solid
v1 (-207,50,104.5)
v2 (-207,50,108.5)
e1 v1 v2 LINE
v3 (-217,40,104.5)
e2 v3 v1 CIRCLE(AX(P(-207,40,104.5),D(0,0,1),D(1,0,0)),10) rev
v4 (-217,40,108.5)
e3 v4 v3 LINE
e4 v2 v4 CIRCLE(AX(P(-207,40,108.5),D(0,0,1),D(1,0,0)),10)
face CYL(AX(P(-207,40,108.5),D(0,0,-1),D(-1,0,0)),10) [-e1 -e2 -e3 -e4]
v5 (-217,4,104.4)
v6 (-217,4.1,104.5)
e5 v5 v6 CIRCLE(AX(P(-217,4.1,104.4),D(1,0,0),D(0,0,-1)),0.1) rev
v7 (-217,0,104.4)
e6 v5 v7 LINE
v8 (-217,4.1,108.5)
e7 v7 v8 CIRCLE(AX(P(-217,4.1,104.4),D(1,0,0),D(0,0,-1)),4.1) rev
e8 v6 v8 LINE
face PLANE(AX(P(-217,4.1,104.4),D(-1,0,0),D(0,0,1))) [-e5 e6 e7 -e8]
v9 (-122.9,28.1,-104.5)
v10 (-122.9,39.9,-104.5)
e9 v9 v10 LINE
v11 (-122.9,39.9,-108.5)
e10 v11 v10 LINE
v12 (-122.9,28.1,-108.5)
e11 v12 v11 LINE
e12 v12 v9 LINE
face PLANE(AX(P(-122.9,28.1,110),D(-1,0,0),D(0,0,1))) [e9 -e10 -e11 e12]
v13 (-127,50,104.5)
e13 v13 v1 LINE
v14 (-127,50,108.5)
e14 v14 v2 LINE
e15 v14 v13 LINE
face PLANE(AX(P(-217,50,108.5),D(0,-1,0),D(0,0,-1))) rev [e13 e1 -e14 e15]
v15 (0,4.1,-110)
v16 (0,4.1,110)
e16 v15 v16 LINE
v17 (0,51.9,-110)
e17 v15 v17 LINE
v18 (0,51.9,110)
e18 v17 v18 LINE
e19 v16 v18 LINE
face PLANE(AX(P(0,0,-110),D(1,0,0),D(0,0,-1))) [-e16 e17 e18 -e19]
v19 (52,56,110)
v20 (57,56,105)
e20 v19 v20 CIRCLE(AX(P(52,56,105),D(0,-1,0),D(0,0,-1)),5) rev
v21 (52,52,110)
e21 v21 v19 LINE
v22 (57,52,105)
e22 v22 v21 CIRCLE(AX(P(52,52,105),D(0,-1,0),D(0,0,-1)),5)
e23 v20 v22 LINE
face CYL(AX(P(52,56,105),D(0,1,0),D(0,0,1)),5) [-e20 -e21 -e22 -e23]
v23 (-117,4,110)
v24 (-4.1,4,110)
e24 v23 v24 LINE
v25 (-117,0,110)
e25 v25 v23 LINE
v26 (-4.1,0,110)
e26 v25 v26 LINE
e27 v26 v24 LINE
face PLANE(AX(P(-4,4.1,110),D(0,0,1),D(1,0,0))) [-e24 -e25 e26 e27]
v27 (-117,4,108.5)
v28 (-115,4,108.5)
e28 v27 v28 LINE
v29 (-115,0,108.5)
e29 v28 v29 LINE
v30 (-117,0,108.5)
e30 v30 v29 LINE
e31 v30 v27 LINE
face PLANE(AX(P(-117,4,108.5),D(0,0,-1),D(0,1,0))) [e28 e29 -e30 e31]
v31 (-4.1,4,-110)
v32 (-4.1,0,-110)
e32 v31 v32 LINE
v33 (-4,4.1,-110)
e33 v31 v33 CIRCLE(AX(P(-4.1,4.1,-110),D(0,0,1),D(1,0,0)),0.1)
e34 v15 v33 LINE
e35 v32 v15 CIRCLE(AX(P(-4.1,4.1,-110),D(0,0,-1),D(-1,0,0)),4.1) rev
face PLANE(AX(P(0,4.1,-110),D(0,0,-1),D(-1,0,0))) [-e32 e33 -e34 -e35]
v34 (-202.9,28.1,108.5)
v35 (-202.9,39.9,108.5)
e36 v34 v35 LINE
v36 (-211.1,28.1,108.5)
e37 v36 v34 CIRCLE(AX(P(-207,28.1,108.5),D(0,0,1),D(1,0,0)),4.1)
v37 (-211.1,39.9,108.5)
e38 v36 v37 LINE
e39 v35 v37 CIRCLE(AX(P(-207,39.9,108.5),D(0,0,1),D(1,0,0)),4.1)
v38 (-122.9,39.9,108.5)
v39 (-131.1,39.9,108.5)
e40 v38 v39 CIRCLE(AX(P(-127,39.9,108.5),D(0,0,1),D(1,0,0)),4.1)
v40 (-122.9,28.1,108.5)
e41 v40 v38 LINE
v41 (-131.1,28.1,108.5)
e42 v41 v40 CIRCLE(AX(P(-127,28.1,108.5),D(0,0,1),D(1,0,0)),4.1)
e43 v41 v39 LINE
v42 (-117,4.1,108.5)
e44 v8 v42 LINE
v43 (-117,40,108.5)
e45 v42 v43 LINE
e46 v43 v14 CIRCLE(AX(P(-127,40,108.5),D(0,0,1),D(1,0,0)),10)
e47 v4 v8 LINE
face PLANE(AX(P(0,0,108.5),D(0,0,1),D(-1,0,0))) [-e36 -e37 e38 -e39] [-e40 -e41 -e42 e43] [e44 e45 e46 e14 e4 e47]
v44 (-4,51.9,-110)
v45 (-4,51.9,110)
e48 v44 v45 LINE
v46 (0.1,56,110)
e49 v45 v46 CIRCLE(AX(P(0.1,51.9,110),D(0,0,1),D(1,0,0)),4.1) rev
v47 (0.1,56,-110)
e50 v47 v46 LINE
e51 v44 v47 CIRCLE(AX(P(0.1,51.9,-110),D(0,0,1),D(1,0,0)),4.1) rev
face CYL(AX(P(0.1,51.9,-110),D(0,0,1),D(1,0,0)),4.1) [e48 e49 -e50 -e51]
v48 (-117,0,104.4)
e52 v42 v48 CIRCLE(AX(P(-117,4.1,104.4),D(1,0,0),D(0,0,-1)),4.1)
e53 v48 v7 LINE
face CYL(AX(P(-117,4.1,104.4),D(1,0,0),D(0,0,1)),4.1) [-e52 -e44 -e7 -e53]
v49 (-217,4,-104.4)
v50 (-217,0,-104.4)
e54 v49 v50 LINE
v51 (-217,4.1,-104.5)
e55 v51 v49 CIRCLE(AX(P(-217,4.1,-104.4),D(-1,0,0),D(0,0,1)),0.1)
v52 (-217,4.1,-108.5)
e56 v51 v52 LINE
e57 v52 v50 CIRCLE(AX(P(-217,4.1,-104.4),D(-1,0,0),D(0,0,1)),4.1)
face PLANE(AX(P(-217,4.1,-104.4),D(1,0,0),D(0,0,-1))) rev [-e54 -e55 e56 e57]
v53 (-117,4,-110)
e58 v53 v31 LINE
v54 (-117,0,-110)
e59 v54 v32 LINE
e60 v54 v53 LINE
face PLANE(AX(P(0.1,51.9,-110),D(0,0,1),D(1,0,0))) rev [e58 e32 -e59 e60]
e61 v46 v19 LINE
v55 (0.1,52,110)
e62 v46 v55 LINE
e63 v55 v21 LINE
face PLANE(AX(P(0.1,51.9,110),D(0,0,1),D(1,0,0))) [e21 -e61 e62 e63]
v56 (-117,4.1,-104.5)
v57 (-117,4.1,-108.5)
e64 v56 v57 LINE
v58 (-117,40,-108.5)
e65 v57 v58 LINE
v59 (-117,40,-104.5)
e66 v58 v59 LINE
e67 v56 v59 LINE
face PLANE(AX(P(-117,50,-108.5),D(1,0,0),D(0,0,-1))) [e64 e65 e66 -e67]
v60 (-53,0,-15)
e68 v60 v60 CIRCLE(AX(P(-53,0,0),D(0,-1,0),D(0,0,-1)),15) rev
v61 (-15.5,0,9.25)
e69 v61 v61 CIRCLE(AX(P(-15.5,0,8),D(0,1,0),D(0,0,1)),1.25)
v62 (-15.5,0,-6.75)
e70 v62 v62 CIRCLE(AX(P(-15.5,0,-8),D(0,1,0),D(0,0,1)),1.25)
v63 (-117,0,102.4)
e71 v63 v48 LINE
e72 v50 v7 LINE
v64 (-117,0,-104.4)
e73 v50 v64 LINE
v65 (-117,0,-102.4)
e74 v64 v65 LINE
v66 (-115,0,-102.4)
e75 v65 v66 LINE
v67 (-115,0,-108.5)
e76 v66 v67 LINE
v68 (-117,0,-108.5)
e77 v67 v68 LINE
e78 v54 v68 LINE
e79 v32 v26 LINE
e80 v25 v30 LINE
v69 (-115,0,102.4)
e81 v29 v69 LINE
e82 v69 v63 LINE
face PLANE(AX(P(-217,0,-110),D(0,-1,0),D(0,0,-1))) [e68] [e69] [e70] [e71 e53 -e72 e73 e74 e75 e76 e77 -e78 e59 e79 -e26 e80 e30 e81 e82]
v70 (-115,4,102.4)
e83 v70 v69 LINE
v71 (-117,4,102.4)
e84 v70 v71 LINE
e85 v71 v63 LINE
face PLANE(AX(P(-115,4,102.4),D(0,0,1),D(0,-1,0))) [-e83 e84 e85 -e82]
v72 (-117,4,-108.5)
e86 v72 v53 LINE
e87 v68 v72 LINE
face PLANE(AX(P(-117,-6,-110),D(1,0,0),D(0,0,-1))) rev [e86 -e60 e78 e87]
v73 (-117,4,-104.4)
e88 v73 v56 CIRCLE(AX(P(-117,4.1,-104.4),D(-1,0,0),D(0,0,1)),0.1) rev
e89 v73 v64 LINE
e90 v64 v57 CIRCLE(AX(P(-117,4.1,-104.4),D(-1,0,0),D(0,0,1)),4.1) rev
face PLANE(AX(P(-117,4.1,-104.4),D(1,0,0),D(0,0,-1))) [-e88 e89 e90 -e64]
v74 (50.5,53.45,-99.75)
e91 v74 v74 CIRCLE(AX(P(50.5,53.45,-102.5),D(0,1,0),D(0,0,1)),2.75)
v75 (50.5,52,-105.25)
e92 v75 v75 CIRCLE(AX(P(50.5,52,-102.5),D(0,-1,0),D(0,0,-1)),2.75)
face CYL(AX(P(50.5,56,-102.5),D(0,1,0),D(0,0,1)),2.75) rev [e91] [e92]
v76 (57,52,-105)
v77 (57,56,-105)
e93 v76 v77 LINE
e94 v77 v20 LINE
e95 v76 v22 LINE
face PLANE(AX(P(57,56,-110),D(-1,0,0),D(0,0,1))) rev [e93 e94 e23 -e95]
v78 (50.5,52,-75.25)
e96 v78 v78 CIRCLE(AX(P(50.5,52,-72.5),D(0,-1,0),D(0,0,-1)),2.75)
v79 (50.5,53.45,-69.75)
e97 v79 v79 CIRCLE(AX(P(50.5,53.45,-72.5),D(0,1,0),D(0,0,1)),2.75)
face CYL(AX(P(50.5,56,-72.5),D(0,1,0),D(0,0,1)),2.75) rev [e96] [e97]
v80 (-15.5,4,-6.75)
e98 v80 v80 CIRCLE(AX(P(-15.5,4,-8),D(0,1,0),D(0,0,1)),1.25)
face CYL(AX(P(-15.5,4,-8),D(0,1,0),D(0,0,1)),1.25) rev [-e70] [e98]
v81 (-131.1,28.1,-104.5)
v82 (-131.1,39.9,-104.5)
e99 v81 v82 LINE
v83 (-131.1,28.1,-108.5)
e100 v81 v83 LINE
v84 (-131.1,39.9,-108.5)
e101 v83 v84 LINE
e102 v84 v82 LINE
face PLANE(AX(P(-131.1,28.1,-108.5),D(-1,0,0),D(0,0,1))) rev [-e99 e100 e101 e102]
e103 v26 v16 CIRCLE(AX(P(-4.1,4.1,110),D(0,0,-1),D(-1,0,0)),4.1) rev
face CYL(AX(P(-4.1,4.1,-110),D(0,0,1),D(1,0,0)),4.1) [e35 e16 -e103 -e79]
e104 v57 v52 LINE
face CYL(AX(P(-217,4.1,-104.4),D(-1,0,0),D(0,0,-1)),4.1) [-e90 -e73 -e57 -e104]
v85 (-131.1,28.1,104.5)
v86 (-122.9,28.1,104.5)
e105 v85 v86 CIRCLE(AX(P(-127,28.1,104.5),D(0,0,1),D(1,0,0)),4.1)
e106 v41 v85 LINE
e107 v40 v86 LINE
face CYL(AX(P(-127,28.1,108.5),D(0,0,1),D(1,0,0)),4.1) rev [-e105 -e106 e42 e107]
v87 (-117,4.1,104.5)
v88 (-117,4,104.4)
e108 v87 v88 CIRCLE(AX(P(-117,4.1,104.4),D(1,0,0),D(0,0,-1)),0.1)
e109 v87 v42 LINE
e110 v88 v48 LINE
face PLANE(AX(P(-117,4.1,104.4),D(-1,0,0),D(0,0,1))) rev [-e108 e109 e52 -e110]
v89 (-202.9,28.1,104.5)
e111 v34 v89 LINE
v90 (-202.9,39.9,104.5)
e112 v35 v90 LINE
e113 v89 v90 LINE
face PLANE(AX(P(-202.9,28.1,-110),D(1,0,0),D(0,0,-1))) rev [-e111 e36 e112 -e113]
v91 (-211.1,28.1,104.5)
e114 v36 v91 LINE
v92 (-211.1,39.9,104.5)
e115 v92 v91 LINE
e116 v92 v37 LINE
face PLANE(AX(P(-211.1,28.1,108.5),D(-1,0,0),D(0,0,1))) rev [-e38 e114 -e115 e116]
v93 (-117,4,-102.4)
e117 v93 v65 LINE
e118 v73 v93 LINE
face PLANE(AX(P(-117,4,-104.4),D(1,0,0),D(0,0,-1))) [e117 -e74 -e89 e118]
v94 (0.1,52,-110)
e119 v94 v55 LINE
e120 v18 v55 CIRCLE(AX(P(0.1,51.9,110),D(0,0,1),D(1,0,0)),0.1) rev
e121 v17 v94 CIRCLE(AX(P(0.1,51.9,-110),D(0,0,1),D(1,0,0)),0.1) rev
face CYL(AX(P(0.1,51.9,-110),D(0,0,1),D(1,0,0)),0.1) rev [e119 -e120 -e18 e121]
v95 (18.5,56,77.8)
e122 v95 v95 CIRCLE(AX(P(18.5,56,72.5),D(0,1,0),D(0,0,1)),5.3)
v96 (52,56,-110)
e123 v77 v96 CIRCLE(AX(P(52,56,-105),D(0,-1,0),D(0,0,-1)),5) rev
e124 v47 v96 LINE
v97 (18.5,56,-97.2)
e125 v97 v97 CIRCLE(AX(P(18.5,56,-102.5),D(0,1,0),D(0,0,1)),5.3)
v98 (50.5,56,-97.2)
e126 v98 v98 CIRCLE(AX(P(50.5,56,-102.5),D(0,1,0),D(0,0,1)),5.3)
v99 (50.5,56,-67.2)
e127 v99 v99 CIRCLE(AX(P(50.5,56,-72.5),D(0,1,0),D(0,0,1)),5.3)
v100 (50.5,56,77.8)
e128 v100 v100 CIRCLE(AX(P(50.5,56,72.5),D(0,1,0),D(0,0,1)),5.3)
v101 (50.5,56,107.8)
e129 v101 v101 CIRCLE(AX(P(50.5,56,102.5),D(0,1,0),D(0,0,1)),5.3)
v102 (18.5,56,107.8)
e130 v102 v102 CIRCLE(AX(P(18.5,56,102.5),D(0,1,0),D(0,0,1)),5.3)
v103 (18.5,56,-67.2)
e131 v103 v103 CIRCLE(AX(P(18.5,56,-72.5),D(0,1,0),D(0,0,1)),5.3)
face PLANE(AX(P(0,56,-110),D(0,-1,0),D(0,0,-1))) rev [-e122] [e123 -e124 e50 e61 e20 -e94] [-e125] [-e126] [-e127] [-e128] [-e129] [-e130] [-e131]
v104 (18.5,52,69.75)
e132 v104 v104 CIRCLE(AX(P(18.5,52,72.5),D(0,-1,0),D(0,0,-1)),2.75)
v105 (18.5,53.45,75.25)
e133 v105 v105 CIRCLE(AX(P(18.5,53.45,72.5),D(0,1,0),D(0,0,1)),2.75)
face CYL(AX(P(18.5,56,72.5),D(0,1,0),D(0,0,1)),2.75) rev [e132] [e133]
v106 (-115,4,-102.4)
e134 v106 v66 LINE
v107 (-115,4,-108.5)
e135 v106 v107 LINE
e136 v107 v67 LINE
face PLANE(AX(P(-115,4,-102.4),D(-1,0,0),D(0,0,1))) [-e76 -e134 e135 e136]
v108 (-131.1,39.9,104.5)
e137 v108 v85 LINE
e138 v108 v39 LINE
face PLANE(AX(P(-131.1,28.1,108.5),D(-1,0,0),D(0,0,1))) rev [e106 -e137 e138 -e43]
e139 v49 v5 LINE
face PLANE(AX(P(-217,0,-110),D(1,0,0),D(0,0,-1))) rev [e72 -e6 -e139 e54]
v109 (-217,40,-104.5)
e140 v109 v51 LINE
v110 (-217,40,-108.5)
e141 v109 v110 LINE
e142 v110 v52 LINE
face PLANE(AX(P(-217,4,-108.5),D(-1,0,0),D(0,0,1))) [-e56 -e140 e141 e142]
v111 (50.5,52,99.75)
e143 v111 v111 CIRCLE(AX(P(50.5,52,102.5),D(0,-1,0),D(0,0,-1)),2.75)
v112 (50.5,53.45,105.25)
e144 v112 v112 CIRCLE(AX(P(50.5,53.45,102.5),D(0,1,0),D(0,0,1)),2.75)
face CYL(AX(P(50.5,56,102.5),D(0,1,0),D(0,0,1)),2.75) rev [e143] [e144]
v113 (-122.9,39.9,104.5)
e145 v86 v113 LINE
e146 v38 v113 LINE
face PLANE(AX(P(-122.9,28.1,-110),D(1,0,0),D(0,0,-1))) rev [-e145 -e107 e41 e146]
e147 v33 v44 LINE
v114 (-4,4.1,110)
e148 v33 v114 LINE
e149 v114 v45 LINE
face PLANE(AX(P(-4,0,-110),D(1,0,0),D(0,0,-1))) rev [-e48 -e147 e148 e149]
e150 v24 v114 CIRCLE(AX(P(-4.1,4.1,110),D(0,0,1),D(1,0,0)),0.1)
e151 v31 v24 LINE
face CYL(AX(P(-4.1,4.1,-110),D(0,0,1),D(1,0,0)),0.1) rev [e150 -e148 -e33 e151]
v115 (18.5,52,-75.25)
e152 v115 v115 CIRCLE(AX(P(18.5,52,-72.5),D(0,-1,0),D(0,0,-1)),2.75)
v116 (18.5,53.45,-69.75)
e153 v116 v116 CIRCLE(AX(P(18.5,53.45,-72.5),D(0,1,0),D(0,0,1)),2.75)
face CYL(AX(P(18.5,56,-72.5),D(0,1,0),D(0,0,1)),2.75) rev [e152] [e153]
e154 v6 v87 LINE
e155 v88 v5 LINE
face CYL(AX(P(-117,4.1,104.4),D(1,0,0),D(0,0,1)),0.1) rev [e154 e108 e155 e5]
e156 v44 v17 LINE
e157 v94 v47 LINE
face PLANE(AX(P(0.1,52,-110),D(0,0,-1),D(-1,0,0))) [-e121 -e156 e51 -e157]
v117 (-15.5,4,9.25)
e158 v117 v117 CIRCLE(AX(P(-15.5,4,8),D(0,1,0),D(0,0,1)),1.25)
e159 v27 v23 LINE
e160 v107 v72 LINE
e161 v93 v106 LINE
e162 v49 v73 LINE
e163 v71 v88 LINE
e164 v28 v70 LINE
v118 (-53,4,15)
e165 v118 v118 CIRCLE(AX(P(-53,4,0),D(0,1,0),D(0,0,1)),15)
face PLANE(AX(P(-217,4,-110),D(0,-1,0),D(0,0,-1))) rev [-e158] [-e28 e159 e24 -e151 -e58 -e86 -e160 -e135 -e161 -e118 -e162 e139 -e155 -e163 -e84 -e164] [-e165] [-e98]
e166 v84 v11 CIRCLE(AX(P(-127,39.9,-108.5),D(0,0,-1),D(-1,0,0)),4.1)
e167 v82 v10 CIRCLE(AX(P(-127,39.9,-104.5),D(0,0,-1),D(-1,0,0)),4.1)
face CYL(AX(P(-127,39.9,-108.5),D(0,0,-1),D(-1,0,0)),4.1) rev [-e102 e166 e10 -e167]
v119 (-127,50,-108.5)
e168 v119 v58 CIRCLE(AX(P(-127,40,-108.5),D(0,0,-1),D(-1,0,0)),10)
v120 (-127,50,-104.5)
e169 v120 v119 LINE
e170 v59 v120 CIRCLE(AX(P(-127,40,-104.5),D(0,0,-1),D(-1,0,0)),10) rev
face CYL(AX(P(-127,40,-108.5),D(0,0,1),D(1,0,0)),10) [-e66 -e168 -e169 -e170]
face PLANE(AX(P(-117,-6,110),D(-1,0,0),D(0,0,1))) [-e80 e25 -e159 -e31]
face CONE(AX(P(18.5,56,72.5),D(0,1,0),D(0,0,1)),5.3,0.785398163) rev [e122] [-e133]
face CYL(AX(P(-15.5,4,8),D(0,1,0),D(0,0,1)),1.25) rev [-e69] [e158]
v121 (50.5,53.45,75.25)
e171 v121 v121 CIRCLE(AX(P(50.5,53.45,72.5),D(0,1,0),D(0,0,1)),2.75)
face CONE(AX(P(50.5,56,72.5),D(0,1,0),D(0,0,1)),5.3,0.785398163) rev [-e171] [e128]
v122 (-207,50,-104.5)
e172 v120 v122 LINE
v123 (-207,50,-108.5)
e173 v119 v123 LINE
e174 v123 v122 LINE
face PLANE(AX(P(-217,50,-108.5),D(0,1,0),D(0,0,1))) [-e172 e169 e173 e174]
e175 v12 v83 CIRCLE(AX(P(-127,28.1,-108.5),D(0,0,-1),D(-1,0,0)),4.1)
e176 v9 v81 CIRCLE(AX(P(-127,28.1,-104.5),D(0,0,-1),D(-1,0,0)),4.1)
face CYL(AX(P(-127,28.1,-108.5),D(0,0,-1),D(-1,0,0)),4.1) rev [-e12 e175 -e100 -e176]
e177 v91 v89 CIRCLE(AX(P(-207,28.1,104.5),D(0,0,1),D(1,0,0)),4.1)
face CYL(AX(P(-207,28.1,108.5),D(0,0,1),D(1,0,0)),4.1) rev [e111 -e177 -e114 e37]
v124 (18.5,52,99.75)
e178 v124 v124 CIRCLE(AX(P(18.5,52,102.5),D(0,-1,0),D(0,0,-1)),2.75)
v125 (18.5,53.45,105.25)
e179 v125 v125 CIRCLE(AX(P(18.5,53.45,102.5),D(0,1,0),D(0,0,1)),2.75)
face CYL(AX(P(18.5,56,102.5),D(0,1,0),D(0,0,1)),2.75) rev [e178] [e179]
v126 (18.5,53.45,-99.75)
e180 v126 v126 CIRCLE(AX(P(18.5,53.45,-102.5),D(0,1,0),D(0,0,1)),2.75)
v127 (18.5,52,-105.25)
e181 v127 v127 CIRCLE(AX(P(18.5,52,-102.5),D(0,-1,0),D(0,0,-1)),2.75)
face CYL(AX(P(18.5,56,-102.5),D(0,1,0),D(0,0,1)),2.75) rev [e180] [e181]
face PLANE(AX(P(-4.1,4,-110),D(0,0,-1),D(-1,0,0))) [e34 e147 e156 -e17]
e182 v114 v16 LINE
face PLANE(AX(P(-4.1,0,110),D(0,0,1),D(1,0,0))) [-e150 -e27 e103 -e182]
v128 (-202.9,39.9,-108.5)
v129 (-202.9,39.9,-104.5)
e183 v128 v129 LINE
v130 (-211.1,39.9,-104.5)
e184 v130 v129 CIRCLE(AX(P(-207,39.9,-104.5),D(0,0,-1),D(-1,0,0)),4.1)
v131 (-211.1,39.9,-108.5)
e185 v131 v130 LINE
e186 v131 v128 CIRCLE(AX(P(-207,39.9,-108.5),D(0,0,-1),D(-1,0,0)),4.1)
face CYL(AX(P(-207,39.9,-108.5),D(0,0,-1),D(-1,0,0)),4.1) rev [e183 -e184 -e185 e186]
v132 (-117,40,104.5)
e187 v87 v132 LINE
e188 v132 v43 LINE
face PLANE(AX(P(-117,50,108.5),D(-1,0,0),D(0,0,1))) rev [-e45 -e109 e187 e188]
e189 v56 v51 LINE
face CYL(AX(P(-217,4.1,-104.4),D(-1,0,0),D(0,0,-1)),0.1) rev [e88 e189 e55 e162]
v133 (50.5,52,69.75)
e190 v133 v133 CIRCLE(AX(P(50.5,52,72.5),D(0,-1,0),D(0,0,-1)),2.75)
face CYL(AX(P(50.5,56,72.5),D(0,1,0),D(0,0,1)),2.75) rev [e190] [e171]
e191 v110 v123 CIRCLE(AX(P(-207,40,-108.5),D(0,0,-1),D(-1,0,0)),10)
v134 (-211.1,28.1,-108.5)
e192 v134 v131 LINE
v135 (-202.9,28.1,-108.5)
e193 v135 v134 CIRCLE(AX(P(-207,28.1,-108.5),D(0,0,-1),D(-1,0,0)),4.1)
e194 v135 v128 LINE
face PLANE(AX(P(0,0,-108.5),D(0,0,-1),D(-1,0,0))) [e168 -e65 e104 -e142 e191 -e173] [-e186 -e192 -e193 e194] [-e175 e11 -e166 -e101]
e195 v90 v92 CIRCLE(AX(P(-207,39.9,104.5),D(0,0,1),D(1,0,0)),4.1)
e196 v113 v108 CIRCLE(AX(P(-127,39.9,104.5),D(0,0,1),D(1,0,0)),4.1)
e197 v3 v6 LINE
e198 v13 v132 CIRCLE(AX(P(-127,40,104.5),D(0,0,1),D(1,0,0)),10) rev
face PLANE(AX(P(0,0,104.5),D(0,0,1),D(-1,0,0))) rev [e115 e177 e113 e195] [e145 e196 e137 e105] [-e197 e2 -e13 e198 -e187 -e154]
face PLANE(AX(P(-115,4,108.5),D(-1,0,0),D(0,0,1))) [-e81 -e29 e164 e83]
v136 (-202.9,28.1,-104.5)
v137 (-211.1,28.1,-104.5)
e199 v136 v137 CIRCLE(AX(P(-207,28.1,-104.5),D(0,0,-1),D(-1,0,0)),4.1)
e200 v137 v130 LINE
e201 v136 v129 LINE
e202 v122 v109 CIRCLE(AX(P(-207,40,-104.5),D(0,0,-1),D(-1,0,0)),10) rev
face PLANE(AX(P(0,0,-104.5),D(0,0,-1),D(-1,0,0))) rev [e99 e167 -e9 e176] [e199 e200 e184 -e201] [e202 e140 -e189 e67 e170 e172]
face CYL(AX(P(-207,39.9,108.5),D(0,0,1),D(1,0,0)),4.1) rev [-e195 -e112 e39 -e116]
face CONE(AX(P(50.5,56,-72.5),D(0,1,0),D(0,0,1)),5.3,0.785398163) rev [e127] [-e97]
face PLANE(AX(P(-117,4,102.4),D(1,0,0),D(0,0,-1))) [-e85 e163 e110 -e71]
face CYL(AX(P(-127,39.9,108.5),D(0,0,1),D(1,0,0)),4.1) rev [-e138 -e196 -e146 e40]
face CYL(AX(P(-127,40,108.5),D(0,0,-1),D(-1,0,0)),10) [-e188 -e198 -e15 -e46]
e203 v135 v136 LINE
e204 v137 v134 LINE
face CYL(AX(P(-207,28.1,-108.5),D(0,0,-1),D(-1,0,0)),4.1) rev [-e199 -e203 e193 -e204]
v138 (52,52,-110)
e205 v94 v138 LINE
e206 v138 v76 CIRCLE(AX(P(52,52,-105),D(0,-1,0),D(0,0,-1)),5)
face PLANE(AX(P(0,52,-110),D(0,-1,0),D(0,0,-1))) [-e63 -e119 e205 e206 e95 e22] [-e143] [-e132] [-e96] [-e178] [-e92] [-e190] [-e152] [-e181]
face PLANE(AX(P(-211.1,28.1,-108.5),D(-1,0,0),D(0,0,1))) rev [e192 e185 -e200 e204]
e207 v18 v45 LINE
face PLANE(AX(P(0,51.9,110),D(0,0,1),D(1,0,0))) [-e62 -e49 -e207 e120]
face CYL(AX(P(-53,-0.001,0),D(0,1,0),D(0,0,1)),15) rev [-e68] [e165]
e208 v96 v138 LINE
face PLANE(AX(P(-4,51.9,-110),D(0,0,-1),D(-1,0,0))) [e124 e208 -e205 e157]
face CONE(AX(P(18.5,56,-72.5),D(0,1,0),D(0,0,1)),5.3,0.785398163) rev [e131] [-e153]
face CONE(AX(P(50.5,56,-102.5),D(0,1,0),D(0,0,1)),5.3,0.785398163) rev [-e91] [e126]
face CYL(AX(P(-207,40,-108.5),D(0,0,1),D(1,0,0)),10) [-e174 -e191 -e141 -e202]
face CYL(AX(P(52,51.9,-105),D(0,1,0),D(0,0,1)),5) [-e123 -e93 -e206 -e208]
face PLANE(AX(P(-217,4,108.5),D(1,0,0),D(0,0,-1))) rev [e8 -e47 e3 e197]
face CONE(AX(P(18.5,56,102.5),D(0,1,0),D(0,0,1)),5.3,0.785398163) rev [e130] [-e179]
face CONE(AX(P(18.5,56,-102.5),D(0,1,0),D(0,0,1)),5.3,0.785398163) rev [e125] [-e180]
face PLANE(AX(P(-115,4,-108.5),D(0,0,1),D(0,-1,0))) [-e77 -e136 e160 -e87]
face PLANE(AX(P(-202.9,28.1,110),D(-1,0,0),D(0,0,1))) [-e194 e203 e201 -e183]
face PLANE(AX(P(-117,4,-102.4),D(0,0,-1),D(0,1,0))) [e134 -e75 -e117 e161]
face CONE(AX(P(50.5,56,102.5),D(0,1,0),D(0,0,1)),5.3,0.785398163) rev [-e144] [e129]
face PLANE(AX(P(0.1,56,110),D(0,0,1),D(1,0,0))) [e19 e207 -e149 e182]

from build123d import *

# Parameters (mm, degrees)
SM_BASE_FLANGE_1_DEPTH      = 110
HOLE_WIZARD_1_D             = 5.5
HOLE_WIZARD_1_CSINK_D       = 10.6
HOLE_WIZARD_1_CSINK_ANGLE   = 90
HOLE_WIZARD_M3_1_D          = 2.5
CUT_EXTRUDE_2_REACH         = 250.783
SKETCH_19_R                 = 15
FILLET_1_R                  = 5
SKETCH_20_W                 = 100
SKETCH_20_H                 = 1.5
CUT_EXTRUDE_3_DEPTH         = 10
SM_START                    = -217
SM_EDGE_FLANGE_2_DEPTH      = 102
SM_START_2                  = -117
SM_EDGE_FLANGE_2_2_DEPTH    = 2
SM_EDGE_FLANGE_2_3_DEPTH    = 100
HOLE_START                  = -108.5
HOLE_WIZARD_8_2_8_2_1_DEPTH = 4
FILLET_2_R                  = 10


# Read off the part's stored shape, not the designer's step: 边线-法兰2, Ø8.2 (8.2) 直径槽口1
# Sheet-metal steps are written as plain solids
with BuildPart() as part:
    # Sketch1 → 基体-法兰1 (new, symmetric)
    with BuildSketch(Plane.XY):
        with BuildLine():
            Line((-217, 0), (-4.1, 0))
            ThreePointArc((-4.1, 0), (-1.200862197, 1.200862197), (0, 4.1))
            Line((0, 4.1), (0, 51.9))
            ThreePointArc((0, 51.9), (0.029289322, 51.970710678), (0.1, 52))
            Line((0.1, 52), (57, 52))
            Line((57, 52), (57, 56))
            Line((57, 56), (0.1, 56))
            ThreePointArc((0.1, 56), (-2.799137803, 54.799137803), (-4, 51.9))
            Line((-4, 51.9), (-4, 4.1))
            ThreePointArc((-4, 4.1), (-4.029289322, 4.029289322), (-4.1, 4))
            Line((-4.1, 4), (-217, 4))
            Line((-217, 4), (-217, 0))
        make_face()
    extrude(amount=SM_BASE_FLANGE_1_DEPTH, both=True)

    # 打孔尺寸开槽半沉头螺钉的类型1 (through all)
    with Locations(Plane(origin=(0, 56, 0), x_dir=(1, 0, 0), z_dir=(0, 1, 0))):
        with Locations((18.5, -102.5), (18.5, -72.5), (50.5, -72.5), (50.5, -102.5)):
            hole_wizard_1 = CounterSinkHole(HOLE_WIZARD_1_D / 2, HOLE_WIZARD_1_CSINK_D / 2, counter_sink_angle=HOLE_WIZARD_1_CSINK_ANGLE)

    # 镜向2: 打孔尺寸开槽半沉头螺钉的类型1 across plane
    add(hole_wizard_1.mirror(Plane.XY), mode=Mode.SUBTRACT)

    # M3 螺纹孔1 (through all)
    with Locations(Plane(origin=(0, 4, 0), x_dir=(1, 0, 0), z_dir=(0, 1, 0))):
        with Locations((-15.5, 8), (-15.5, -8)):
            Hole(HOLE_WIZARD_M3_1_D / 2)

    # 草图19 → 切除-拉伸2 (cut, up to next)
    with BuildSketch(Plane(origin=(0, 4, 0), x_dir=(1, 0, 0), z_dir=(0, 1, 0)), mode=Mode.PRIVATE) as cut_extrude_2_sk1:
        with Locations(Location((-53, 0, 0), (0, 0, 270))):
            Circle(SKETCH_19_R)
    cut_extrude_2_tool1 = extrude(cut_extrude_2_sk1.sketch, amount=-CUT_EXTRUDE_2_REACH, mode=Mode.PRIVATE) & part.part
    add(cut_extrude_2_tool1.solids().sort_by_distance((-53, 4, 0))[0], mode=Mode.SUBTRACT)

    # 圆角1
    fillet_1_edges = [part.edges().sort_by_distance(p)[0] for p in [
        (57, 54, 110),
        (57, 54, -110),
    ]]
    fillet(fillet_1_edges, radius=FILLET_1_R)

    # 草图20 → 切除-拉伸3 (cut)
    with BuildSketch(Plane(origin=(0, 4, 0), x_dir=(1, 0, 0), z_dir=(0, 1, 0))):
        with Locations((-167, 109.25)):
            Rectangle(SKETCH_20_W, SKETCH_20_H)
    cut_extrude_3 = extrude(amount=-CUT_EXTRUDE_3_DEPTH, mode=Mode.SUBTRACT)

    # 镜向5: 切除-拉伸3 across plane
    add(cut_extrude_3.mirror(Plane.XY), mode=Mode.SUBTRACT)

    # 边线-法兰2 outline → 边线-法兰2 (cut)
    with BuildSketch(Plane.YZ.offset(SM_START)):
        with BuildLine():
            ThreePointArc((4, -108.498780306), (1.16571985, -107.263564213), (0, -104.4))
            Line((0, -104.4), (0, -108.5))
            Line((0, -108.5), (4, -108.5))
            Line((4, -108.5), (4, -108.498780306))
        make_face()
    sm_edge_flange_2 = extrude(amount=SM_EDGE_FLANGE_2_DEPTH, mode=Mode.SUBTRACT)

    # Sm Edge Flange 2 2 outline → Sm Edge Flange 2 2 (cut)
    with BuildSketch(Plane.YZ.offset(SM_START_2)):
        with BuildLine():
            Line((4, -102.4), (0, -102.4))
            Line((0, -102.4), (0, -104.4))
            ThreePointArc((0, -104.4), (1.16571985, -107.263564213), (4, -108.498780306))
            Line((4, -108.498780306), (4, -102.4))
        make_face()
    sm_edge_flange_2_2 = extrude(amount=SM_EDGE_FLANGE_2_2_DEPTH, mode=Mode.SUBTRACT)

    # Sm Edge Flange 2 3 outline → Sm Edge Flange 2 3 (add)
    with BuildSketch(Plane.YZ.offset(SM_START)):
        with BuildLine():
            ThreePointArc((4.1, -104.5), (4.029289322, -104.470710678), (4, -104.4))
            Line((4, -104.4), (4, -108.498780306))
            ThreePointArc((4, -108.498780306), (4.049996281, -108.499695065), (4.1, -108.5))
            Line((4.1, -108.5), (50, -108.5))
            Line((50, -108.5), (50, -104.5))
            Line((50, -104.5), (4.1, -104.5))
        make_face()
    sm_edge_flange_2_3 = extrude(amount=SM_EDGE_FLANGE_2_3_DEPTH)

    # Ø8.2 (8.2) 直径槽口1 outline → Ø8.2 (8.2) 直径槽口1 (cut)
    with BuildSketch(Plane.XY.offset(HOLE_START)):
        with BuildLine():
            ThreePointArc((-202.9, 39.9), (-207, 44), (-211.1, 39.9))
            Line((-211.1, 39.9), (-211.1, 28.1))
            ThreePointArc((-211.1, 28.1), (-207, 24), (-202.9, 28.1))
            Line((-202.9, 28.1), (-202.9, 39.9))
        make_face()
        with BuildLine():
            ThreePointArc((-122.9, 39.9), (-127, 44), (-131.1, 39.9))
            Line((-131.1, 39.9), (-131.1, 28.1))
            ThreePointArc((-131.1, 28.1), (-127, 24), (-122.9, 28.1))
            Line((-122.9, 28.1), (-122.9, 39.9))
        make_face()
    hole_wizard_8_2_8_2_1 = extrude(amount=HOLE_WIZARD_8_2_8_2_1_DEPTH, mode=Mode.SUBTRACT)

    # 镜向6: 边线-法兰2, Sm Edge Flange 2 2, Sm Edge Flange 2 3, Ø8.2 (8.2) 直径槽口1 across plane
    add(sm_edge_flange_2.mirror(Plane.XY), mode=Mode.SUBTRACT)
    add(sm_edge_flange_2_2.mirror(Plane.XY), mode=Mode.SUBTRACT)
    add(sm_edge_flange_2_3.mirror(Plane.XY))
    add(hole_wizard_8_2_8_2_1.mirror(Plane.XY), mode=Mode.SUBTRACT)

    # 圆角2
    fillet_2_edges = [part.edges().sort_by_distance(p)[0] for p in [
        (-117, 50, -106.5),
        (-217, 50, -106.5),
        (-217, 50, 106.5),
        (-117, 50, 106.5),
    ]]
    fillet(fillet_2_edges, radius=FILLET_2_R)


solid = part.part
